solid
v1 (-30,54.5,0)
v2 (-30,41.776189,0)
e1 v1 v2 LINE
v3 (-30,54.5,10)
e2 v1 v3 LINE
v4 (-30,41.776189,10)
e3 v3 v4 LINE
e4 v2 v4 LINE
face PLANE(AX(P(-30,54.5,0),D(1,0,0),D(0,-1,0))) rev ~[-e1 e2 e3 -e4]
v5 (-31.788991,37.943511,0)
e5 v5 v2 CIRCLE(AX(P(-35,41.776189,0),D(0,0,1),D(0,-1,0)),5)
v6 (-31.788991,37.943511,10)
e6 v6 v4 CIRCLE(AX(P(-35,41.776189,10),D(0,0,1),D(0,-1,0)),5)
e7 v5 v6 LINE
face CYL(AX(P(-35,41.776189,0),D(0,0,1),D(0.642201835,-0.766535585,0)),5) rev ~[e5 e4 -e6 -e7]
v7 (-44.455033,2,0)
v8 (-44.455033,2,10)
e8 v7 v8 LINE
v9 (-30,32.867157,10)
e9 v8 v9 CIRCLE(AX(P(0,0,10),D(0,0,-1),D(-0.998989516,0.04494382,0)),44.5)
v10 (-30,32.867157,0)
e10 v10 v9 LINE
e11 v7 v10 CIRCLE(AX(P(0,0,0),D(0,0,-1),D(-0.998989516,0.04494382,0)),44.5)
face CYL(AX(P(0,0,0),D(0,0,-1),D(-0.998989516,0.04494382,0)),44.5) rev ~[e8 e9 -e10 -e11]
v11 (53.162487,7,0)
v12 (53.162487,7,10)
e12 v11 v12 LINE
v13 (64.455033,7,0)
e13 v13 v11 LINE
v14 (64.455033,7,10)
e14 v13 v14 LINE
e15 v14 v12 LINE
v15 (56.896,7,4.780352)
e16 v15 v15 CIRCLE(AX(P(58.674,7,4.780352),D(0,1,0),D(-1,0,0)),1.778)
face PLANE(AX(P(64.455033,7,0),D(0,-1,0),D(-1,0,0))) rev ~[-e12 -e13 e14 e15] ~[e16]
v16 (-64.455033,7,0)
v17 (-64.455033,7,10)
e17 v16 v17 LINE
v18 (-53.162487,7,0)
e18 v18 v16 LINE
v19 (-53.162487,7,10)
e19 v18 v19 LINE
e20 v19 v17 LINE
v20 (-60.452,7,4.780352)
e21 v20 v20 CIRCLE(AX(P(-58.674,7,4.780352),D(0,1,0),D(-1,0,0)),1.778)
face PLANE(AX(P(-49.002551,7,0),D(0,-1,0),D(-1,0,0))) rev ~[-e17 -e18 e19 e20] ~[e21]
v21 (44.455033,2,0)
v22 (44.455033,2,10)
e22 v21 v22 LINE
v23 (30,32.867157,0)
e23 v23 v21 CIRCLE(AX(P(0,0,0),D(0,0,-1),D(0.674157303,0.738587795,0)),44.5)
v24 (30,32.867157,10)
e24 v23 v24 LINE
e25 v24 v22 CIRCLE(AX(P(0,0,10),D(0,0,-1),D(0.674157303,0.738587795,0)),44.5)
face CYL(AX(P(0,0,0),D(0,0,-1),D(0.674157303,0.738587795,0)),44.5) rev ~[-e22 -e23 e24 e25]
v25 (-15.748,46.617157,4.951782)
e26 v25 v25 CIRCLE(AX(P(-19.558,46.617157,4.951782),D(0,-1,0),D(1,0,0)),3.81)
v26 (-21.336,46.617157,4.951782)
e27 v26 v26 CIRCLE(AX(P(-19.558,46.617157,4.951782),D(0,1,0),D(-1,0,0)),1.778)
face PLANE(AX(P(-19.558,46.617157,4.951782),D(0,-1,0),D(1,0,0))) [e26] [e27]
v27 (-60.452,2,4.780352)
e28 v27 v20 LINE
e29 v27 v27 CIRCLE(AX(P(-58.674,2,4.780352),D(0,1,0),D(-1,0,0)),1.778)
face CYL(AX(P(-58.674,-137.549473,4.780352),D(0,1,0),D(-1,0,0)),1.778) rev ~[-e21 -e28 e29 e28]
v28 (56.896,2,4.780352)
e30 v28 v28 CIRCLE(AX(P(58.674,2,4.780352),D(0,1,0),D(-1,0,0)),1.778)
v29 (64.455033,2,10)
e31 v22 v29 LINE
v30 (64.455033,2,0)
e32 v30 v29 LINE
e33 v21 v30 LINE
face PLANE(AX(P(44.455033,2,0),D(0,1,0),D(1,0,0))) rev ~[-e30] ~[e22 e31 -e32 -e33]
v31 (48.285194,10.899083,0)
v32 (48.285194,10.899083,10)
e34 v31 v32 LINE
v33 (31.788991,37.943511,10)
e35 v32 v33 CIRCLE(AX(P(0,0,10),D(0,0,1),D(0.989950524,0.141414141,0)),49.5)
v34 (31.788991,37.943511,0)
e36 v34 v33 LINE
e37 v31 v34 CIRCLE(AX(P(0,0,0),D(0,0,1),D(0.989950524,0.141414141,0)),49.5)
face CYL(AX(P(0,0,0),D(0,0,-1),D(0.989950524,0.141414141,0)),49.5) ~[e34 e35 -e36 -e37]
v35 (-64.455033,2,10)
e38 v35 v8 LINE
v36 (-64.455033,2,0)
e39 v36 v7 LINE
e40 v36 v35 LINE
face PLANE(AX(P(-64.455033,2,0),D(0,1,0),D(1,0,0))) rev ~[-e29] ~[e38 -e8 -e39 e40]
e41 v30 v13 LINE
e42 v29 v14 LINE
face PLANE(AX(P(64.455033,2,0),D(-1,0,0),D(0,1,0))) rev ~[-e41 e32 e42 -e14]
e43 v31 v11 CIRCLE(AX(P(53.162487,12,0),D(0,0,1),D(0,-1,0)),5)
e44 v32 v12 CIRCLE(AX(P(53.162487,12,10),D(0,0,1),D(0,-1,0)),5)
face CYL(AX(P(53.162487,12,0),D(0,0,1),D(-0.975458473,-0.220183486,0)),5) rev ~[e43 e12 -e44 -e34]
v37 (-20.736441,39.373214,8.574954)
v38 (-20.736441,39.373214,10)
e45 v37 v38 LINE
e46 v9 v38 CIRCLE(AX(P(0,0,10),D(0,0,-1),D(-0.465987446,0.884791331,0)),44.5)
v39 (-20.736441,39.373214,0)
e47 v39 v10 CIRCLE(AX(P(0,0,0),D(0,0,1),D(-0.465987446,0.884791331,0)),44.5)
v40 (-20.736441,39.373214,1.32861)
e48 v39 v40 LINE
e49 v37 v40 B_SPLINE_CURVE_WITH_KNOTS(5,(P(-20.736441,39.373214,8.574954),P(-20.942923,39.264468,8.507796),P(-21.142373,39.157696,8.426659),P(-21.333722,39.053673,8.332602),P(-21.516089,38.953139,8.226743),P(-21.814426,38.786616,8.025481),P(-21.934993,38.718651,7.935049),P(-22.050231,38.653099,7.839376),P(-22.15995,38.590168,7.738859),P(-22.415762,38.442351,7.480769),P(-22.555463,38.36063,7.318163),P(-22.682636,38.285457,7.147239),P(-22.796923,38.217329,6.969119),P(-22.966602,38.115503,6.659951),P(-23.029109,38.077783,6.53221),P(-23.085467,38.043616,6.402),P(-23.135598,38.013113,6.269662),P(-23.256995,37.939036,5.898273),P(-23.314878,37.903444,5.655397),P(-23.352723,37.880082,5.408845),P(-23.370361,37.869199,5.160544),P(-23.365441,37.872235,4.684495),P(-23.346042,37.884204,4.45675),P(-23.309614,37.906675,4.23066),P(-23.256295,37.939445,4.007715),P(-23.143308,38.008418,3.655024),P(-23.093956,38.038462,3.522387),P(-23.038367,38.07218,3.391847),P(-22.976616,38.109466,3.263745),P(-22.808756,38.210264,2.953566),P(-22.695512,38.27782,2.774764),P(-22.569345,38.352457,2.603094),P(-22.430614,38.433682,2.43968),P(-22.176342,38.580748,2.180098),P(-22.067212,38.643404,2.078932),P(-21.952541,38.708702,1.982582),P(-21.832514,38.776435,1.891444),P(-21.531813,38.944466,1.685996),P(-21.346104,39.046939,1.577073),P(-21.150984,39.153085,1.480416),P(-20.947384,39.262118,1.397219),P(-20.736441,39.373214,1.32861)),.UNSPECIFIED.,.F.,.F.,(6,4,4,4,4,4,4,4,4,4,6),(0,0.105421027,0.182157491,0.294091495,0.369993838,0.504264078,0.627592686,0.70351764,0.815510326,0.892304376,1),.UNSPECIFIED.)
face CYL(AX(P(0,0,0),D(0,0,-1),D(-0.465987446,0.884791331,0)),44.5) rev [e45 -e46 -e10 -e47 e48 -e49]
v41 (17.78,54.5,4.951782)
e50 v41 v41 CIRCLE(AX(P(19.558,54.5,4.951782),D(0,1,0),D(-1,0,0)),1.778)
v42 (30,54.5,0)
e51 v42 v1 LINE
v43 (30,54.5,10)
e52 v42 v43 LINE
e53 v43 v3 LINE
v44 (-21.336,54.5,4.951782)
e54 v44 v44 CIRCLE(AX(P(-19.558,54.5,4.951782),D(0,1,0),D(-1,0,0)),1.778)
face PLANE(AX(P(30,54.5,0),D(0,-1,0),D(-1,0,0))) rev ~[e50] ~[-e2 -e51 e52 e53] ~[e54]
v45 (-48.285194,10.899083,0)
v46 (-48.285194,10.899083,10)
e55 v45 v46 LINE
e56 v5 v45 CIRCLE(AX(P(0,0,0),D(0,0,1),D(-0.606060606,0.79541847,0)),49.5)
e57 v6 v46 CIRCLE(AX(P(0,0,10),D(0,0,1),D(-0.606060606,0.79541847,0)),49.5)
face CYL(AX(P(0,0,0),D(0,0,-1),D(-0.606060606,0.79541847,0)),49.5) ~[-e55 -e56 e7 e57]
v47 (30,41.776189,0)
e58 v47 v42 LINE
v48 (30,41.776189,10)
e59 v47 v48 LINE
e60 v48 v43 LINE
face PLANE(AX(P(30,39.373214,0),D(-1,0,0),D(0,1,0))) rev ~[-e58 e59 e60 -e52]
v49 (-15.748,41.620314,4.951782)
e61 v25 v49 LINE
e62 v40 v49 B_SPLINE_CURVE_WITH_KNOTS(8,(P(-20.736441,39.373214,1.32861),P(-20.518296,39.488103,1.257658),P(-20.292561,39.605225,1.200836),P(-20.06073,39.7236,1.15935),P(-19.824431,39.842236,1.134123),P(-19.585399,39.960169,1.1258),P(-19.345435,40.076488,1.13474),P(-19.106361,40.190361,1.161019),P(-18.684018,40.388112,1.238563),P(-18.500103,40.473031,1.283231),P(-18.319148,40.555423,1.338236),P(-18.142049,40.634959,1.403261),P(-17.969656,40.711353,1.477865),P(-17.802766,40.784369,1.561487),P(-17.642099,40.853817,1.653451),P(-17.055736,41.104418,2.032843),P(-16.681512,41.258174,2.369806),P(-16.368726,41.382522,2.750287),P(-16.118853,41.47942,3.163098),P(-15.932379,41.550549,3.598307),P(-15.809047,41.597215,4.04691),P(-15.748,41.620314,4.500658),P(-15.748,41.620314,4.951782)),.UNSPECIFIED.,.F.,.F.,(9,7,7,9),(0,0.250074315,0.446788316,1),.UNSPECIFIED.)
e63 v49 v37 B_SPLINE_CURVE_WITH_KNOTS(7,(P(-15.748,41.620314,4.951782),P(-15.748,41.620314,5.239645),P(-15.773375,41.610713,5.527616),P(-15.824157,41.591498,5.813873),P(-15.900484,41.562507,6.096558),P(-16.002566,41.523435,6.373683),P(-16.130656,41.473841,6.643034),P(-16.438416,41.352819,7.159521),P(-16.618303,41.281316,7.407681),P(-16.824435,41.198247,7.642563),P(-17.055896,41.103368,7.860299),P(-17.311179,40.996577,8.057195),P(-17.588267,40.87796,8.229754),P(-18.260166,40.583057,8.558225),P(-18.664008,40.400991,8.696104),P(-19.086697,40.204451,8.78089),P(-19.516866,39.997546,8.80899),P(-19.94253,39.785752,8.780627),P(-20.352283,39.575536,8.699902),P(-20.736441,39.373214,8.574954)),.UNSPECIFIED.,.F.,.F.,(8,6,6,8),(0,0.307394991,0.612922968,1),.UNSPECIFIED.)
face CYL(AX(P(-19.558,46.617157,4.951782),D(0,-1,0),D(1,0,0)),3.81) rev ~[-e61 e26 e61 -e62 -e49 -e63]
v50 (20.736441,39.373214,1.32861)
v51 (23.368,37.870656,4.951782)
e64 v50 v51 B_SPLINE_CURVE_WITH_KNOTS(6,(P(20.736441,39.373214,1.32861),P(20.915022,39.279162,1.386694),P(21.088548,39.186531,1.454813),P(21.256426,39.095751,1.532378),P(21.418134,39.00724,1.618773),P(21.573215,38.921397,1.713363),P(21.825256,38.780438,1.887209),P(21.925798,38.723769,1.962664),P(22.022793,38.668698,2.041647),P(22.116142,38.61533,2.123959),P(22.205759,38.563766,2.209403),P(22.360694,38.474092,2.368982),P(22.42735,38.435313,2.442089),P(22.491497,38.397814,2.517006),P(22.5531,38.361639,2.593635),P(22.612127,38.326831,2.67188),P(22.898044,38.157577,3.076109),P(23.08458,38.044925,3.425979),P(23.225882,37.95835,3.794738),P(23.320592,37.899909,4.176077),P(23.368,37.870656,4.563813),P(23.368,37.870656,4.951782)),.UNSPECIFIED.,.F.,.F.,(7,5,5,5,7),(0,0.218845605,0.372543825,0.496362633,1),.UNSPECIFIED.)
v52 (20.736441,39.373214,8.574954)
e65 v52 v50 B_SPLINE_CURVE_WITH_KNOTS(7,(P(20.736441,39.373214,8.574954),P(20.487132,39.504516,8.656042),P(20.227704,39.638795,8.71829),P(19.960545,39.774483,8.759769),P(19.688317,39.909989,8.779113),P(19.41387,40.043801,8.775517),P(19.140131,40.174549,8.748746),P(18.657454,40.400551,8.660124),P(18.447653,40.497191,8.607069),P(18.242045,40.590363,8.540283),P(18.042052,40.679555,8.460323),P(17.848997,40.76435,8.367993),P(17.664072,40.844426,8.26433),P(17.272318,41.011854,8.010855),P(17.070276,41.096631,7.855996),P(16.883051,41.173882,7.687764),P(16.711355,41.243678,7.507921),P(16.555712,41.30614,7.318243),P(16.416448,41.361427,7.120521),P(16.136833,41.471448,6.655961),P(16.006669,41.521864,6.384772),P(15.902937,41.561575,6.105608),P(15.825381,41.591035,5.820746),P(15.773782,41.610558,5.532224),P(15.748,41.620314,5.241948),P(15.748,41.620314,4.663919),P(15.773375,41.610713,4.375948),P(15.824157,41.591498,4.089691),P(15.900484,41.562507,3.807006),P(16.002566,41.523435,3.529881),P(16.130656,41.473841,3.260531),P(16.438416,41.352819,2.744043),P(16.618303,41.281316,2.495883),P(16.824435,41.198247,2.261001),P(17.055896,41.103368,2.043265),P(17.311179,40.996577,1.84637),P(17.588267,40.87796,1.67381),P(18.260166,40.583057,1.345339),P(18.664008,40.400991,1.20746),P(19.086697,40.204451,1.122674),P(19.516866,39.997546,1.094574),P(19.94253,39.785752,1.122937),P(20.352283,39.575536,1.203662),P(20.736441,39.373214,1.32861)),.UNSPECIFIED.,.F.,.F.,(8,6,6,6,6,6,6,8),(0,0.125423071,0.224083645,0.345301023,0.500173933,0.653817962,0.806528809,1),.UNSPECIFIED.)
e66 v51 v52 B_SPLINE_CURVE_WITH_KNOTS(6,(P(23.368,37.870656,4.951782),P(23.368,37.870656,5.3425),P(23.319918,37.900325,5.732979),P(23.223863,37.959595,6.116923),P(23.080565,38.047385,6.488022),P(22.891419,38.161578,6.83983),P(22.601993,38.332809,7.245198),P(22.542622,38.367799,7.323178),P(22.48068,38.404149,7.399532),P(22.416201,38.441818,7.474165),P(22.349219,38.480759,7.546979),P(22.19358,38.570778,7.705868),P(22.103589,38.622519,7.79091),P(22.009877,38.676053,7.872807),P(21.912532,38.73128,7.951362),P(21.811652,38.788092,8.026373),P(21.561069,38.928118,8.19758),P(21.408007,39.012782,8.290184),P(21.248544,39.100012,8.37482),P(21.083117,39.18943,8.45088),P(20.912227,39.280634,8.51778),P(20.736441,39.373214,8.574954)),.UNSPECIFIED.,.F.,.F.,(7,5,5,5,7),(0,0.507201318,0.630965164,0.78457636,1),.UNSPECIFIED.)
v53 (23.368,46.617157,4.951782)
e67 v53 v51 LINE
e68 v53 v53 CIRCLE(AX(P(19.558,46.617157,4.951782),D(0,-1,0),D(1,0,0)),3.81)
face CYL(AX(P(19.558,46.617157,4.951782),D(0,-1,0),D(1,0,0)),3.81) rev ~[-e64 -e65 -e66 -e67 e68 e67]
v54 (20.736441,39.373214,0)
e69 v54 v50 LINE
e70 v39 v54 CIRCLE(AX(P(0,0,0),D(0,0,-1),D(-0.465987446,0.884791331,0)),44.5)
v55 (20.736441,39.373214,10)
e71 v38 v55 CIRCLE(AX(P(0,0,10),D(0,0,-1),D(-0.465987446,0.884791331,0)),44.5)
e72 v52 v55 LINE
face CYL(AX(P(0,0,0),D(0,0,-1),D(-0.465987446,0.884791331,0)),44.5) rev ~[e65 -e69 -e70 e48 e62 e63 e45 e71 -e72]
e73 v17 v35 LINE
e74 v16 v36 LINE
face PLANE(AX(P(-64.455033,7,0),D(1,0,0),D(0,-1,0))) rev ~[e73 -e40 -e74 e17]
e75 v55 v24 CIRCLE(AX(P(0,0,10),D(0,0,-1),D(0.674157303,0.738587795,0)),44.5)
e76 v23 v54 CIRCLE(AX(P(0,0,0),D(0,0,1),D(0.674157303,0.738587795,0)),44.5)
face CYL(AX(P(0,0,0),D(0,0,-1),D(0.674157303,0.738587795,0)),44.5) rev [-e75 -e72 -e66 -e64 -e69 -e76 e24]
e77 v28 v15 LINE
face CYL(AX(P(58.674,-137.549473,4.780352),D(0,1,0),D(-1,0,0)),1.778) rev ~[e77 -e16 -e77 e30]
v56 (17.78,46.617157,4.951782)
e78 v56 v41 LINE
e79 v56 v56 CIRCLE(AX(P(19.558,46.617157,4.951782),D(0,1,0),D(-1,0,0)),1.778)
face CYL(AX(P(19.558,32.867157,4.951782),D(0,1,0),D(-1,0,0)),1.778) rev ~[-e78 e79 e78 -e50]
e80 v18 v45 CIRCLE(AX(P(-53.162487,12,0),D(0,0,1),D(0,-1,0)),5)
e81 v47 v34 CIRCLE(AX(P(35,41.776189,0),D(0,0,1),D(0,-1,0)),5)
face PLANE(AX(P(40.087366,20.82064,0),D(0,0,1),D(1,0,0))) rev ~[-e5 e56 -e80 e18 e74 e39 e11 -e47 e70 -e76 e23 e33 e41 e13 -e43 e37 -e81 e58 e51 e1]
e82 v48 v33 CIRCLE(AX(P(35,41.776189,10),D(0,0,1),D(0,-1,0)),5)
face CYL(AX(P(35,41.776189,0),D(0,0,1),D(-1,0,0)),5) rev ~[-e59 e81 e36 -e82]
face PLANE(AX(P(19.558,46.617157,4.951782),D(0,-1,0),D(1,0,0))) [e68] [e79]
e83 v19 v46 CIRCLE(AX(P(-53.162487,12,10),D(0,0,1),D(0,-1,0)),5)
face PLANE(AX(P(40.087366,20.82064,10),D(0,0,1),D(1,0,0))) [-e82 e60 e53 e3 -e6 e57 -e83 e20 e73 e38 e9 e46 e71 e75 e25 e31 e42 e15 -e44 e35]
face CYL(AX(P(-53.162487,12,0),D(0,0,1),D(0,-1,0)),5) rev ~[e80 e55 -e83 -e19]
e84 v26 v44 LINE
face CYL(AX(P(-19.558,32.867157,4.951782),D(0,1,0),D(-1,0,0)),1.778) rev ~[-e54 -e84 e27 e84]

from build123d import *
from build123d import SkipClean  # not in build123d's __all__

# Parameters (mm, degrees)
F1_DEPTH       = 10
F3_D           = 3.556
F3_CBORE_D     = 7.62
F3_CBORE_DEPTH = 13.75
F4_DEPTH       = 10.0010001
F6_D           = 3.556
F7_R           = 5


with BuildPart() as f1:
    # F0 (on Top) → F1 (new body)
    with BuildSketch(Plane.XY):
        with BuildLine():
            ThreePointArc((30, 32.8671568591), (40.2999174323, 18.8723780946), (44.4550334608, 2))
            Line((44.4550334608, 2), (44.4550334608, 7))
            Line((44.4550334608, 7), (49.002550954, 7))
            ThreePointArc((49.002550954, 7), (42.6890737127, 25.0577929106), (30, 39.3732142452))
            Line((30, 39.3732142452), (30, 32.8671568591))
        make_face()
        with BuildLine():
            ThreePointArc((20.7364413533, 39.3732142452), (25.5759421328, 36.4159468368), (30, 32.8671568591))
            Line((30, 32.8671568591), (30, 39.3732142452))
            Line((30, 39.3732142452), (20.7364413533, 39.3732142452))
        make_face()
        with BuildLine():
            ThreePointArc((-20.7364413533, 39.3732142452), (0, 44.5), (20.7364413533, 39.3732142452))
            Line((20.7364413533, 39.3732142452), (30, 39.3732142452))
            ThreePointArc((30, 39.3732142452), (15.8315491079, 46.9000218853), (-1.83e-08, 49.5))
            ThreePointArc((-1.83e-08, 49.5), (-15.8315491253, 46.9000218795), (-30, 39.3732142452))
            Line((-30, 39.3732142452), (-20.7364413533, 39.3732142452))
        make_face()
        with BuildLine():
            Line((-30, 39.3732142452), (-30, 32.8671568591))
            ThreePointArc((-30, 32.8671568591), (-25.5759421328, 36.4159468368), (-20.7364413533, 39.3732142452))
            Line((-20.7364413533, 39.3732142452), (-30, 39.3732142452))
        make_face()
        with BuildLine():
            ThreePointArc((-44.4550334608, 2), (-40.2999174323, 18.8723780946), (-30, 32.8671568591))
            Line((-30, 32.8671568591), (-30, 39.3732142452))
            ThreePointArc((-30, 39.3732142452), (-42.6890737127, 25.0577929106), (-49.002550954, 7))
            Line((-49.002550954, 7), (-44.4550334608, 7))
            Line((-44.4550334608, 7), (-44.4550334608, 2))
        make_face()
        with BuildLine():
            Line((-64.4550334608, 2), (-49.4595794564, 2))
            ThreePointArc((-49.4595794564, 2), (-49.2945005172, 4.5057983491), (-49.002550954, 7))
            Line((-49.002550954, 7), (-64.4550334608, 7))
            Line((-64.4550334608, 7), (-64.4550334608, 2))
        make_face()
        with BuildLine():
            Line((-49.4595794564, 2), (-44.4550334608, 2))
            Line((-44.4550334608, 2), (-44.4550334608, 7))
            Line((-44.4550334608, 7), (-49.002550954, 7))
            ThreePointArc((-49.002550954, 7), (-49.2945005172, 4.5057983491), (-49.4595794564, 2))
        make_face()
        with BuildLine():
            Line((44.4550334608, 7), (44.4550334608, 2))
            Line((44.4550334608, 2), (49.4595794564, 2))
            ThreePointArc((49.4595794564, 2), (49.2945005172, 4.5057983491), (49.002550954, 7))
            Line((49.002550954, 7), (44.4550334608, 7))
        make_face()
        with BuildLine():
            ThreePointArc((49.002550954, 7), (49.2945005172, 4.5057983491), (49.4595794564, 2))
            Line((49.4595794564, 2), (64.4550334608, 2))
            Line((64.4550334608, 2), (64.4550334608, 7))
            Line((64.4550334608, 7), (49.002550954, 7))
        make_face()
        with BuildLine():
            Line((-30, 49.5), (-30, 39.3732142452))
            ThreePointArc((-30, 39.3732142452), (-15.8315491253, 46.9000218795), (-1.83e-08, 49.5))
            Line((-1.83e-08, 49.5), (-30, 49.5))
        make_face()
        with BuildLine():
            ThreePointArc((-1.83e-08, 49.5), (15.8315491079, 46.9000218853), (30, 39.3732142452))
            Line((30, 39.3732142452), (30, 49.5))
            Line((30, 49.5), (-1.83e-08, 49.5))
        make_face()
        with BuildLine():
            Line((-30, 32.8671568591), (30, 32.8671568591))
            ThreePointArc((30, 32.8671568591), (25.5759421328, 36.4159468368), (20.7364413533, 39.3732142452))
            Line((20.7364413533, 39.3732142452), (-20.7364413533, 39.3732142452))
            ThreePointArc((-20.7364413533, 39.3732142452), (-25.5759421328, 36.4159468368), (-30, 32.8671568591))
        make_face()
        Polygon((-30, 49.5), (-1.83e-08, 49.5), (30, 49.5), (30, 54.5), (-30, 54.5), align=None)
    extrude(amount=F1_DEPTH)

    # F3 (through all)
    with Locations(Plane.XZ.offset(-32.8671568591)):
        with Locations((-19.558, 4.9517820589), (19.558, 4.9517820589)):
            CounterBoreHole(F3_D / 2, F3_CBORE_D / 2, F3_CBORE_DEPTH)

    # F0 (on Top) → F4 (cut, through all)
    with BuildSketch(Plane.XY):
        with BuildLine():
            Line((-30, 32.8671568591), (30, 32.8671568591))
            ThreePointArc((30, 32.8671568591), (25.5759421328, 36.4159468368), (20.7364413533, 39.3732142452))
            Line((20.7364413533, 39.3732142452), (-20.7364413533, 39.3732142452))
            ThreePointArc((-20.7364413533, 39.3732142452), (-25.5759421328, 36.4159468368), (-30, 32.8671568591))
        make_face()
    with SkipClean():  # cleaning this boolean's faces spoils the solid; the shape is the same uncleaned
        extrude(amount=F4_DEPTH, mode=Mode.SUBTRACT)

    # F6 (through all)
    with Locations(Plane.XZ.offset(-2)):
        with Locations((-58.674, 4.78035165), (58.674, 4.78035165)):
            Hole(F6_D / 2)

    # F7
    f7_edges = [f1.edges().sort_by_distance(p)[0] for p in [
        (-49.002551, 7, 5),
        (49.002551, 7, 5),
        (30, 39.373214, 5),
        (-30, 39.373214, 5),
    ]]
    fillet(f7_edges, radius=F7_R)


solid = f1.part
